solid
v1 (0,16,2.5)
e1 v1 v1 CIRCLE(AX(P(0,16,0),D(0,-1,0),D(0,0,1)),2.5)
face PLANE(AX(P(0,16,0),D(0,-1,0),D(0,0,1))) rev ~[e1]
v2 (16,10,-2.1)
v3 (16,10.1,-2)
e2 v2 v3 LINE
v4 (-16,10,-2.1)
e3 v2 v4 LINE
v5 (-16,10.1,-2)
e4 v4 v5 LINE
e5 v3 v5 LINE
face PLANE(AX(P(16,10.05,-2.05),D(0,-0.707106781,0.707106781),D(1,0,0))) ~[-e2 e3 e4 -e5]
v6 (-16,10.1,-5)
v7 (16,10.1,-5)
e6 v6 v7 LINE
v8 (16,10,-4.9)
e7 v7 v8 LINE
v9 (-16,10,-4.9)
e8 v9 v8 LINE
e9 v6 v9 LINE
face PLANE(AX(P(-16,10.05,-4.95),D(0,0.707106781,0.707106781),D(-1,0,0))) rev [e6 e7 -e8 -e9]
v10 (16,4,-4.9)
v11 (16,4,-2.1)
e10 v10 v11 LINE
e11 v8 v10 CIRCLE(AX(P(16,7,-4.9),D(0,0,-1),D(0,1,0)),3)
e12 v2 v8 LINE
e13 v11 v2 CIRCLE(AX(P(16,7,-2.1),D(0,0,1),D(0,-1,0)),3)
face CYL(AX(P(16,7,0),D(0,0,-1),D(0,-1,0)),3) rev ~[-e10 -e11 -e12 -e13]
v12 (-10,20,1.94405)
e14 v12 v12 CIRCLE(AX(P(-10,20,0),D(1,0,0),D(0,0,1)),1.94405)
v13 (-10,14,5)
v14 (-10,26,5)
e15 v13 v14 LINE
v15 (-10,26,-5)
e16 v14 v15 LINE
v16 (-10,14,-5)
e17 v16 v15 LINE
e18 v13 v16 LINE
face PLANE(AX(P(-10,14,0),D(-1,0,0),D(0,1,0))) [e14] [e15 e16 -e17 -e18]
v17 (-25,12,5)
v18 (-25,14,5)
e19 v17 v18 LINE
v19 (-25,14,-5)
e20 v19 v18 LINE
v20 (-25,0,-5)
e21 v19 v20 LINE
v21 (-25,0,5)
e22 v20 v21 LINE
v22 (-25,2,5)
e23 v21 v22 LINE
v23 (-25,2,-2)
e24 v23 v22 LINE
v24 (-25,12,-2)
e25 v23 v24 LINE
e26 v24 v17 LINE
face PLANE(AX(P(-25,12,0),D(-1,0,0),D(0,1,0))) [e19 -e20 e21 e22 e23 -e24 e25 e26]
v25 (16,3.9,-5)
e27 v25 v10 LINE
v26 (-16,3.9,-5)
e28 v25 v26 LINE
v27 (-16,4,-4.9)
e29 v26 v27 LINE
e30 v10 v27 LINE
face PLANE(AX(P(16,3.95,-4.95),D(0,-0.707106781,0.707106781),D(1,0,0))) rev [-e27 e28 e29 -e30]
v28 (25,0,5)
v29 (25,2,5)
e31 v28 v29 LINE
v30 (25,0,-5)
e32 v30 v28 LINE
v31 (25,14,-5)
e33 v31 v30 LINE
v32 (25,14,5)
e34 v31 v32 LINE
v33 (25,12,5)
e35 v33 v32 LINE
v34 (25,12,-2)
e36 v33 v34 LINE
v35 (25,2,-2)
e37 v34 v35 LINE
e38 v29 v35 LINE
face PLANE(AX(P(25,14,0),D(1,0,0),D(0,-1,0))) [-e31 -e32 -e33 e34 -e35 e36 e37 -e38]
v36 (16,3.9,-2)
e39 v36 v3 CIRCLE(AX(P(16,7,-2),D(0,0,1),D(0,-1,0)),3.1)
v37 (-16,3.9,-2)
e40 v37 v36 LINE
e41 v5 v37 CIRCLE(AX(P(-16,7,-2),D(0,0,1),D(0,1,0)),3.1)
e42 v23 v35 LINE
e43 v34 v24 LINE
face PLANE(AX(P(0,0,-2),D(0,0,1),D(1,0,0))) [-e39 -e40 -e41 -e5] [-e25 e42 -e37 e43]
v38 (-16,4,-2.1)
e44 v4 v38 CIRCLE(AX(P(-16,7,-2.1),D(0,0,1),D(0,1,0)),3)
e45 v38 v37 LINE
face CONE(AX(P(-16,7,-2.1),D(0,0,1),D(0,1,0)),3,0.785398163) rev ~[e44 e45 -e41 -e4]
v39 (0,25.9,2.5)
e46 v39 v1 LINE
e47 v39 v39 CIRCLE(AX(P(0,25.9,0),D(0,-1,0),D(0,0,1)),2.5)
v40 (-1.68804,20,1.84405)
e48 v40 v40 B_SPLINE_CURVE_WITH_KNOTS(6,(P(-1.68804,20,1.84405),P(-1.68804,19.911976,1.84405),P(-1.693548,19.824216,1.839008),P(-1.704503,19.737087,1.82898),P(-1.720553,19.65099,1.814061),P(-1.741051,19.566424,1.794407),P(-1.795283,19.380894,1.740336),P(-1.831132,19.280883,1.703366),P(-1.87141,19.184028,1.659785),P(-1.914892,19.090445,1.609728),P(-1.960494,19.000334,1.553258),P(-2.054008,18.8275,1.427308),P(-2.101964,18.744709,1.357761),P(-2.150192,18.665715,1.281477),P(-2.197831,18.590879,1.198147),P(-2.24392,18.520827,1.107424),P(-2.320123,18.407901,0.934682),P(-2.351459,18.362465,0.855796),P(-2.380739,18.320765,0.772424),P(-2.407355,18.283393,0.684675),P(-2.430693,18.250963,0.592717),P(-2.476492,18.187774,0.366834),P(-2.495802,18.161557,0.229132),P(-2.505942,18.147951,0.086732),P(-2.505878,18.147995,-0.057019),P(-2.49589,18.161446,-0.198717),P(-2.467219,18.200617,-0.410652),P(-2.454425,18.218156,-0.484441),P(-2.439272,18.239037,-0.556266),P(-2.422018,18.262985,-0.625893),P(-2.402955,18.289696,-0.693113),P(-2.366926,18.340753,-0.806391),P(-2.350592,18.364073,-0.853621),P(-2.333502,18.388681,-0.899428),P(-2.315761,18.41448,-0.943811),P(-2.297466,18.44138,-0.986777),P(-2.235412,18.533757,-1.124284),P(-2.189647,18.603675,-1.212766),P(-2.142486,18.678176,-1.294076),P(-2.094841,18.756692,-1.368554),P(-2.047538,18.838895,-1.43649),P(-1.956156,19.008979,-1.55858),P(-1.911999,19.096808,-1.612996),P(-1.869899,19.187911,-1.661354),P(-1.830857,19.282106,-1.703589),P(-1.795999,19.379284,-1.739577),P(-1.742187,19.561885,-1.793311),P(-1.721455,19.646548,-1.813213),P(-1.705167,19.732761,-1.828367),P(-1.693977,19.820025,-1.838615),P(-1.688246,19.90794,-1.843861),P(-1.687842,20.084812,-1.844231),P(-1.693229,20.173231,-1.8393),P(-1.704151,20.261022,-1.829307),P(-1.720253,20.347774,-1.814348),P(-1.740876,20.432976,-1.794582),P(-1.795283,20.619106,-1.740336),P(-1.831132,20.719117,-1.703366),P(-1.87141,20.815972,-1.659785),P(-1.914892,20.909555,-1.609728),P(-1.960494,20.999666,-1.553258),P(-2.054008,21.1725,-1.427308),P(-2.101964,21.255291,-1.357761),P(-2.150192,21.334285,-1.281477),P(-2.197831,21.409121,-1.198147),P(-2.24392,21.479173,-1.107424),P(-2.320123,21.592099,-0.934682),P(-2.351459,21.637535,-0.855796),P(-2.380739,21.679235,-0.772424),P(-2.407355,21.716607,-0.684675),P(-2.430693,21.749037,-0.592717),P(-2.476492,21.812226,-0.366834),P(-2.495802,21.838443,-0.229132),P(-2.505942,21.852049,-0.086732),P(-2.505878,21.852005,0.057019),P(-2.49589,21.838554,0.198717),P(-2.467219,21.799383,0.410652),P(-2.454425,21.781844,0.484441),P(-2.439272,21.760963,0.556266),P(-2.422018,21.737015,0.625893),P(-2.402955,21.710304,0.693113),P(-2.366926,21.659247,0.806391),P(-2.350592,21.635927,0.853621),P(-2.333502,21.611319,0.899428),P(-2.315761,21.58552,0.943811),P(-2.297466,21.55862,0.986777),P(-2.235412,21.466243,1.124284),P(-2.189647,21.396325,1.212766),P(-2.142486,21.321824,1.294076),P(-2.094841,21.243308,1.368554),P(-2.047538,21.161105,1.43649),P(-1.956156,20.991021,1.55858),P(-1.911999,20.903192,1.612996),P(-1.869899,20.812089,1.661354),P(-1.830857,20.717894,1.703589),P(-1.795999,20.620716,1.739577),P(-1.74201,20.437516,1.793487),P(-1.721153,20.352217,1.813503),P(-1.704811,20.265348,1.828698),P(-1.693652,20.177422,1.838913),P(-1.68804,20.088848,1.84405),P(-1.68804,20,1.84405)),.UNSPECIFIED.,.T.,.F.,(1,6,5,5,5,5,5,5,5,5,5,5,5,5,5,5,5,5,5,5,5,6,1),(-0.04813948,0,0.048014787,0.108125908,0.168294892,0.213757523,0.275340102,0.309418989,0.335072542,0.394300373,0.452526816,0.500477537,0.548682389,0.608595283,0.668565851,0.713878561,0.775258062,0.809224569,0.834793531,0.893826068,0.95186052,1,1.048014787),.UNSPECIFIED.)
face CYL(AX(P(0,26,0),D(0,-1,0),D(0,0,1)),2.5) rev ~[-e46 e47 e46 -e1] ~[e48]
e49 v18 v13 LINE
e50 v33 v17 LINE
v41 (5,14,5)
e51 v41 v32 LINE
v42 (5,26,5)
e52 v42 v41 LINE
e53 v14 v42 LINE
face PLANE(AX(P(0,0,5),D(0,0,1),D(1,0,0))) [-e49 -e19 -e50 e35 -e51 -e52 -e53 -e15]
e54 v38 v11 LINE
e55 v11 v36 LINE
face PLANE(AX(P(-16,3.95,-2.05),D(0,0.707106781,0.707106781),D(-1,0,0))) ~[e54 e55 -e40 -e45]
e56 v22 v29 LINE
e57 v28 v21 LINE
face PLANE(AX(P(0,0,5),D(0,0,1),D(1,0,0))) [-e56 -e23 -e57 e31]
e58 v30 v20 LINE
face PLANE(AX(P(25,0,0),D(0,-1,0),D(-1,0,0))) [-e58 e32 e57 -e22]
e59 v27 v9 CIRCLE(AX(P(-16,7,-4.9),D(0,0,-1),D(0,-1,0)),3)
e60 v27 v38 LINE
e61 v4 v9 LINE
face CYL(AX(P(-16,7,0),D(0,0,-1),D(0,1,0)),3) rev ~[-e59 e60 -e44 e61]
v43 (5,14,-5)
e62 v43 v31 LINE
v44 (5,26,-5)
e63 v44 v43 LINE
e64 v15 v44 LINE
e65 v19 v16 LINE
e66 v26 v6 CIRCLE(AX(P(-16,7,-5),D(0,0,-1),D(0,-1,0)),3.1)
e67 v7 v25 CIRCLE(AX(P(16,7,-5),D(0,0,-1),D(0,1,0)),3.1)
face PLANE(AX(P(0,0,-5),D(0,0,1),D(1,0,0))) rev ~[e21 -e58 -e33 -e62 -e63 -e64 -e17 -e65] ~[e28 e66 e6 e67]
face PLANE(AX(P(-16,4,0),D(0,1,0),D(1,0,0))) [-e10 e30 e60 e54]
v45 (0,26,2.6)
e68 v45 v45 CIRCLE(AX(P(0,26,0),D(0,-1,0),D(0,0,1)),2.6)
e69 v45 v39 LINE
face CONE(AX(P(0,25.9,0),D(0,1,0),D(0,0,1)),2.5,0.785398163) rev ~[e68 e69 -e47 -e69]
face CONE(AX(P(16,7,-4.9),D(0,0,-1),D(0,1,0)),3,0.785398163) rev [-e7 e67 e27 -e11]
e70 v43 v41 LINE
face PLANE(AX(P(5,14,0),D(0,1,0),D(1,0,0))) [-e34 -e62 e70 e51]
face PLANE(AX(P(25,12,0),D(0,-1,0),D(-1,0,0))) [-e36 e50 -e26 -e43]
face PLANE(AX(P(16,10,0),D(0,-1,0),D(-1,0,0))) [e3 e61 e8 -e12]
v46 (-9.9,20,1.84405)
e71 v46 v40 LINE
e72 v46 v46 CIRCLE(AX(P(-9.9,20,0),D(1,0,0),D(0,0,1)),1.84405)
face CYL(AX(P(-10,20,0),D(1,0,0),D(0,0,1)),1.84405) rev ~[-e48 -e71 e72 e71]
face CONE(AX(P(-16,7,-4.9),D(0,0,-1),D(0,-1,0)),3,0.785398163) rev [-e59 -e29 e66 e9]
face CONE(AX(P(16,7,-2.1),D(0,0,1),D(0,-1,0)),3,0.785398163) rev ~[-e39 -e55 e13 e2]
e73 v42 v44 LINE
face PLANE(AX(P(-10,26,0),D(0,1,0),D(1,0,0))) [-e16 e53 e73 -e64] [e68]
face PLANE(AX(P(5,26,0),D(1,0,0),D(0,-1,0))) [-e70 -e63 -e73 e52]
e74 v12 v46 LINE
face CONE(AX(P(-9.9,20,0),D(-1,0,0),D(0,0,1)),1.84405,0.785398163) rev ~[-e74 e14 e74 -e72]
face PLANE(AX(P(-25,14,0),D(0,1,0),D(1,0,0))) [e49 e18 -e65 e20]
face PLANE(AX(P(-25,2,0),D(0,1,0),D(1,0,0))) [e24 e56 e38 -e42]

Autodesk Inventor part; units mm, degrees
ref_plane "YZ Plane" through (0, 0, 0) normal (1, 0, 0) x (0, 1, 0)
ref_plane "XZ Plane" through (0, 0, 0) normal (0, 1, 0) x (-1, 0, 0)
ref_plane "XY Plane" through (0, 0, 0) normal (0, 0, 1) x (1, 0, 0)
sketch "Sketch1" plane through (0, 0, 0) normal (0, 0, 1) x (1, 0, 0)
  line L0 (-25, 14) -> (-10, 14)
  line L1 (-10, 14) -> (-10, 26)
  line L2 (-10, 26) -> (5, 26)
  line L3 (5, 26) -> (5, 14)
  line L4 (5, 14) -> (25, 14)
  line L5 (25, 14) -> (25, 0)
  line L6 (25, 0) -> (-25, 0)
  line L7 (-25, 0) -> (-25, 14)
  line L8 (-16, 7) -> (16, 7) construction
  line L9 (-16, 4) -> (16, 4)
  line L10 (16, 10) -> (-16, 10)
  arc A0 (-16, 10) -> (-16, 4) centre (-16, 7) ccw
  arc A1 (16, 4) -> (16, 10) centre (16, 7) ccw
  line L11 (25, 12) -> (-25, 12)
  line L12 (-25, 2) -> (25, 2)
  point P0 (0, 0)
  point P1 (0, 0)
  point P2 (0, 7)
  point P3 (0, 26)
  point P4 (-10, 20)
  dimension "d0" = 26
  dimension "d1" = 14
  dimension "d2" = 50
  dimension "d3" = 15
  dimension "d4" = 15
  dimension "d7" = 32
  dimension "d8" = 6
  dimension "d9" = 10
extrude "Extrusion1" add sketch "Sketch1" along normal mid plane 10 contours L0 L1 L2 L3 L4 L5 L11 L7 | L11 L5 L12 L7 | L12 L5 L6 L7 | A0 L10 A1 L9
extrude "Extrusion2" cut sketch "Sketch1" along normal blind 5 and the other way blind 2 contours L11 L5 L12 L7
extrude "Extrusion3" cut sketch "Sketch1" along normal through all both and the other way through all contours A0 L10 A1 L9
hole "Hole1" at (0, 26, 0) direction (0, -1, 0) diameter 5 depth 10
hole "Hole2" at (-10, 20, 0) direction (1, 0, 0) diameter 3.6881 end up to surface thread size "M4.5x0.75" class "6H" standard "ISO Metric profile"
chamfer "Chamfer1" distance 0.1 angle 45 10 edges at (-10, 20, -1.8441) (0, 26, -2.5) (0, 4, -2) (19, 7, -2) (0, 10, -2) (-19, 7, -2) (0, 4, -5) (19, 7, -5) (0, 10, -5) (-19, 7, -5)
properties part number "Crosshead"
